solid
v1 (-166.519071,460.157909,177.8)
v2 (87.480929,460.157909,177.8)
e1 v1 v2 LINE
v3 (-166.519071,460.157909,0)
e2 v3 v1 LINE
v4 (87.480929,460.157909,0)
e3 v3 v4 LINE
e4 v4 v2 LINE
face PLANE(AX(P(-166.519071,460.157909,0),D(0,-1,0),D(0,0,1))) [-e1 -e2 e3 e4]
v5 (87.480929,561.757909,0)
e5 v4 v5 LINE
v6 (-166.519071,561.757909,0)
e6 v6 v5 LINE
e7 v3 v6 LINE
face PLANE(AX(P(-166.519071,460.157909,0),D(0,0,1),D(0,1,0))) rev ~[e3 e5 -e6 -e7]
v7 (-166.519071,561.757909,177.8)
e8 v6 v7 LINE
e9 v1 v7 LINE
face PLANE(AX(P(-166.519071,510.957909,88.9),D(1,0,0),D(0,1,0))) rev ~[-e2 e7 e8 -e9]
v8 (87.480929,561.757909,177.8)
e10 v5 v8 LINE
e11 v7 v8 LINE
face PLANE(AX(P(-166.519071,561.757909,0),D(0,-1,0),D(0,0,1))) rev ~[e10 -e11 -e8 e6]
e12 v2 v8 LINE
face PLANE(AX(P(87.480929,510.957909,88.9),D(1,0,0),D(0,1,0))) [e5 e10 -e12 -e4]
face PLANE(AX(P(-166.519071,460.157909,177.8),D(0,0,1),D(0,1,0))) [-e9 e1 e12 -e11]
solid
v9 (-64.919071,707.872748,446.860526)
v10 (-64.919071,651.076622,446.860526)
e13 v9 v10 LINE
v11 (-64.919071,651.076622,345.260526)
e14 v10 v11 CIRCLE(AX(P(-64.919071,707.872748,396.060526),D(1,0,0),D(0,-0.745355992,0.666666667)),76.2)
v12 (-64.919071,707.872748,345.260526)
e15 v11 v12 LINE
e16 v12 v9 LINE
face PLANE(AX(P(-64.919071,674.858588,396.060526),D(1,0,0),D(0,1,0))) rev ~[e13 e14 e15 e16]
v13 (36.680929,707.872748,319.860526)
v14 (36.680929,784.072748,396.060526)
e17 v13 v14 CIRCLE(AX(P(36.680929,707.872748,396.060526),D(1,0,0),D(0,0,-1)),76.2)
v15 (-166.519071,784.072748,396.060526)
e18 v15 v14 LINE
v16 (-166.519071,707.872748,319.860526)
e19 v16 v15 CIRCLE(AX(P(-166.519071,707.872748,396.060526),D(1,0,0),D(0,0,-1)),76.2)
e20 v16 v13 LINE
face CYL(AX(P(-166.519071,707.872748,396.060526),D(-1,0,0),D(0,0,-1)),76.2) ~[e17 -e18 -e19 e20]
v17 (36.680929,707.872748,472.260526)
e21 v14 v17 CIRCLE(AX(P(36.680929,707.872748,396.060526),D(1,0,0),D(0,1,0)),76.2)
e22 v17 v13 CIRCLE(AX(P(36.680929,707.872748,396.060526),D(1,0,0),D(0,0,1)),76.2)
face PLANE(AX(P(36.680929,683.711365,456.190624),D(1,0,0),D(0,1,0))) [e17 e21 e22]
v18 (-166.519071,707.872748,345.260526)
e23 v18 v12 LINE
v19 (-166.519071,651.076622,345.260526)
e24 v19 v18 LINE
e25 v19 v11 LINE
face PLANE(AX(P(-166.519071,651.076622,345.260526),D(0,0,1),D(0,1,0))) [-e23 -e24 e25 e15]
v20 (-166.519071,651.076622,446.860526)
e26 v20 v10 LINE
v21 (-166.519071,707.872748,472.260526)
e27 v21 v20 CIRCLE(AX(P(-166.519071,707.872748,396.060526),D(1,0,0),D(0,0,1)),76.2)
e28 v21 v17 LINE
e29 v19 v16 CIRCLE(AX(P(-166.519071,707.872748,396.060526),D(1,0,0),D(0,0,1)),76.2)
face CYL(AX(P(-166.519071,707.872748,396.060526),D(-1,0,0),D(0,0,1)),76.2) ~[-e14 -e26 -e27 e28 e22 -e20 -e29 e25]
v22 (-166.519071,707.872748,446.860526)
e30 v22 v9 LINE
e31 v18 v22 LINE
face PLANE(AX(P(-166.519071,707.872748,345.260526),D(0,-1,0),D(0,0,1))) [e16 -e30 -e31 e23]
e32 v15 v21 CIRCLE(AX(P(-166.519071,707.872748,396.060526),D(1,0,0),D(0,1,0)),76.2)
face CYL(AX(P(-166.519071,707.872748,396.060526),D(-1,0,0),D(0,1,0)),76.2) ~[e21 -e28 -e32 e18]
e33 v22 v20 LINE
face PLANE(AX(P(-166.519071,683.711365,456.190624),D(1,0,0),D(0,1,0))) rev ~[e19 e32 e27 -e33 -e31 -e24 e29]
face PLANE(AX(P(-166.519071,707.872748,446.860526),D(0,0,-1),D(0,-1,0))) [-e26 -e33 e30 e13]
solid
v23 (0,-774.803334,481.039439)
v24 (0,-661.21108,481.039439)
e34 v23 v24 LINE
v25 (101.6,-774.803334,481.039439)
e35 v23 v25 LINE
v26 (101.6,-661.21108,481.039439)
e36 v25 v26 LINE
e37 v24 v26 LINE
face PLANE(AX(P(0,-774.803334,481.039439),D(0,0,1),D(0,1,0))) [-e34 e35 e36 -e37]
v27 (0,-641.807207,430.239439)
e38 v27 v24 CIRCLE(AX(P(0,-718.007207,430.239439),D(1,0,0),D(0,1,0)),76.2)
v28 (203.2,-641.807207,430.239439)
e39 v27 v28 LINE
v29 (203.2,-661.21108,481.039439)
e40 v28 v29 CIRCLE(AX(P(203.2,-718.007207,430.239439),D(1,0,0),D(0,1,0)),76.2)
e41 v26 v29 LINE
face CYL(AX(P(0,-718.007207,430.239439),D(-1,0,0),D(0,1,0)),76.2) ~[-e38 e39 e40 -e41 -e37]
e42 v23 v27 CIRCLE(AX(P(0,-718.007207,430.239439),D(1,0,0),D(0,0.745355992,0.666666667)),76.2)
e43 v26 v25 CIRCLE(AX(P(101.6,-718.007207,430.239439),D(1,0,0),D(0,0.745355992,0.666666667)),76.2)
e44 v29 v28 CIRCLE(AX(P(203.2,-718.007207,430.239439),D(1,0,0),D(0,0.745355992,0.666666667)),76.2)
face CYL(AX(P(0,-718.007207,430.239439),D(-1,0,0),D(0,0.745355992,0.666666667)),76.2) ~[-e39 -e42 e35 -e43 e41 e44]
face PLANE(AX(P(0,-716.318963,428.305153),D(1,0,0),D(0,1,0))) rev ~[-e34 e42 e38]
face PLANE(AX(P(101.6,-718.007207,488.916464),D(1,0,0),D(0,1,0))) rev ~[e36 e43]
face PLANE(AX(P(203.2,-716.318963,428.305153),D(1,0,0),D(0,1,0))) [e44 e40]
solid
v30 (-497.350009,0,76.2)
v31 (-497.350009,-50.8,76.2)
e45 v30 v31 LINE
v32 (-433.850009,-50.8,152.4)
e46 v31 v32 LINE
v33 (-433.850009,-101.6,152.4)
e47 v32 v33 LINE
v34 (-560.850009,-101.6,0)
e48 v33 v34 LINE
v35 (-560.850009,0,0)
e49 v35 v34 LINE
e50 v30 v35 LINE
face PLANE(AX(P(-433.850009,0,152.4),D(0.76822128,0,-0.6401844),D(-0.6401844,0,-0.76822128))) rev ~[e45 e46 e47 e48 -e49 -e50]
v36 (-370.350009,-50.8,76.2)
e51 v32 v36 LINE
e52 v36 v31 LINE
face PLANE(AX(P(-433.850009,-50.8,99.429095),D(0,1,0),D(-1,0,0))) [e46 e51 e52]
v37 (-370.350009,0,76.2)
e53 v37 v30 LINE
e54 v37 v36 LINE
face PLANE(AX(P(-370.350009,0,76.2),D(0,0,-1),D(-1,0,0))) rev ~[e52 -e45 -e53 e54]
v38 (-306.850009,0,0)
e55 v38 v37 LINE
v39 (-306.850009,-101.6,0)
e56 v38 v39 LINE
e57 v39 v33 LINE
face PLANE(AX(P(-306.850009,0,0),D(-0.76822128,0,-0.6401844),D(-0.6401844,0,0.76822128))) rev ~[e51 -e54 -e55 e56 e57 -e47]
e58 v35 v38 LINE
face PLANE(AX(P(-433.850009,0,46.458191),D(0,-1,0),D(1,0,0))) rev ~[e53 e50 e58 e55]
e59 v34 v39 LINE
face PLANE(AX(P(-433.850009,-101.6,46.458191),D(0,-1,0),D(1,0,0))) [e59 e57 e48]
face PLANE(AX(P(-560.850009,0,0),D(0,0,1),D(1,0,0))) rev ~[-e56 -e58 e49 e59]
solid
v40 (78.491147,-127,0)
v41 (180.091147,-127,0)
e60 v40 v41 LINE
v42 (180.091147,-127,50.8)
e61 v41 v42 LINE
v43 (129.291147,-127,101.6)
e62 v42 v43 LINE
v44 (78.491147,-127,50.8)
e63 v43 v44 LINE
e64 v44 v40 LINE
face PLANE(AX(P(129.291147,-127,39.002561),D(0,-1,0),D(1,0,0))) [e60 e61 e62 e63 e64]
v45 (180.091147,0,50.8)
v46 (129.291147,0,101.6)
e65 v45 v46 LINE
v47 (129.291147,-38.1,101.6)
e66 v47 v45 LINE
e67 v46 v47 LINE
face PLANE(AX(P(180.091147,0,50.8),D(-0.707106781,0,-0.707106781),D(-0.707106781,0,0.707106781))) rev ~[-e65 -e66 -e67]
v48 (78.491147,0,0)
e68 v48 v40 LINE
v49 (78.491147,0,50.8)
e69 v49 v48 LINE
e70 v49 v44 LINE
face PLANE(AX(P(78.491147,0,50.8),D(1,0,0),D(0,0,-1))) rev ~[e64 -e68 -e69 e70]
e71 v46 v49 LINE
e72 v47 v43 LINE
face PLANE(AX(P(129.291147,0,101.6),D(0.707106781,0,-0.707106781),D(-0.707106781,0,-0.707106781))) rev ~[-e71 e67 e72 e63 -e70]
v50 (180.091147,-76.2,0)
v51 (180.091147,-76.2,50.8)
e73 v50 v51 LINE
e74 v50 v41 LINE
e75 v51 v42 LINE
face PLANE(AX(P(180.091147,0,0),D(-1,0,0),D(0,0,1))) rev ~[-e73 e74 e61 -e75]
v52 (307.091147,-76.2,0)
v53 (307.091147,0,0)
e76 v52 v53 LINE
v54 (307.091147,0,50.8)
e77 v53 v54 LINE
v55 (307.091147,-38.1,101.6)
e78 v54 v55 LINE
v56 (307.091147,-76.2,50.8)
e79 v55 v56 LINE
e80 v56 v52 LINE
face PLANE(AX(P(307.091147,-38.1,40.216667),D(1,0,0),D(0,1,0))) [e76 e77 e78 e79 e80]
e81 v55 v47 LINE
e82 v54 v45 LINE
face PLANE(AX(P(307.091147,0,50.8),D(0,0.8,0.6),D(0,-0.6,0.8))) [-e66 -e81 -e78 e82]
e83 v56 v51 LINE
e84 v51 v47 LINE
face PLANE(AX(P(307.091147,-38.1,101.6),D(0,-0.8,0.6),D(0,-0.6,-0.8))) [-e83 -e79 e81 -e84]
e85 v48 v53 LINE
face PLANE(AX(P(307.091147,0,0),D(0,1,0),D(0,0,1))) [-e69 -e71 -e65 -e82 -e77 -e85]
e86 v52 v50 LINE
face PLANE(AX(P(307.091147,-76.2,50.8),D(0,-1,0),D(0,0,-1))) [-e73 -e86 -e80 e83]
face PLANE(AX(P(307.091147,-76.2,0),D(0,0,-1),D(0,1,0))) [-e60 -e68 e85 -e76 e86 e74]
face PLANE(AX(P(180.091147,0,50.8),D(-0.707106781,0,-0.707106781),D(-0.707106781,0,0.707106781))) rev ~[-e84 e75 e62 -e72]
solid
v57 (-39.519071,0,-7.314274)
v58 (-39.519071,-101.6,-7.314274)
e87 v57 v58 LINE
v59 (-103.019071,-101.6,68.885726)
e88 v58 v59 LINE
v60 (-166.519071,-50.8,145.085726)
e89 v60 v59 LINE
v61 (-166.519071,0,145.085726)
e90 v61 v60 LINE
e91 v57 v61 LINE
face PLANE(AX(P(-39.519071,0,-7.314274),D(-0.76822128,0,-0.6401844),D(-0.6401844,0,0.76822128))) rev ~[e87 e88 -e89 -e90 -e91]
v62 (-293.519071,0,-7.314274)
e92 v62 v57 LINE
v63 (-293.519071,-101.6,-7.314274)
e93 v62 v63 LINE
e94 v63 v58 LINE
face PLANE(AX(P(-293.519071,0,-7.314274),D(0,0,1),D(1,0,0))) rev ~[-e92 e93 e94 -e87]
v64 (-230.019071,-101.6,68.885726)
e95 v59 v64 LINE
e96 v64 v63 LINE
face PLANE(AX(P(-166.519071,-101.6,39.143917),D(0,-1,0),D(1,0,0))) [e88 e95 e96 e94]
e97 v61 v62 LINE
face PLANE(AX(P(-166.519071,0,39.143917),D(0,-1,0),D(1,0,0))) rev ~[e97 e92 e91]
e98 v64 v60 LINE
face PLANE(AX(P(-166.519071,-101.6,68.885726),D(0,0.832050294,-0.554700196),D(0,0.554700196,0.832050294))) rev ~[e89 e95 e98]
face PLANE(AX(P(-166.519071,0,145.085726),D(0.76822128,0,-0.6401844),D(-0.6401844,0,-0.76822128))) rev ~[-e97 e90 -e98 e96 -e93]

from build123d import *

# Parameters (mm, degrees)
F1_DEPTH  = 101.6
F3_DEPTH  = 50.8
F5_DEPTH  = 101.6
F9_DEPTH  = 76.2
F11_DEPTH = 127
F14_DEPTH = 177.8
F16_DEPTH = 203.2
F18_DEPTH = 101.6
F20_DEPTH = 203.2
F21_DEPTH = 101.6
F22_W     = 101.6
F22_H     = 177.8
F23_DEPTH = 254


# Not quite as in the source:
# - a feature of the source that left no trace in its solid (it failed there, or was rolled back) is left out


with BuildPart() as f1:
    # F0 (on Front) → F1 (new body)
    with BuildSketch(Plane.XZ):
        Polygon((-433.850009223, 152.4), (-560.850009223, 0), (-306.850009223, 0), align=None)
    extrude(amount=F1_DEPTH)

    # F2 (on face) → F3 (cut)
    with BuildSketch(Plane(origin=(0, 0, 0), x_dir=(-1, 0, 0), z_dir=(0, 1, 0))):
        Polygon((433.850009223, 152.4), (370.350009223, 76.2), (497.350009223, 76.2), align=None)
    extrude(amount=-F3_DEPTH, mode=Mode.SUBTRACT)


with BuildPart() as f5:
    # F4 (on Front) → F5 (new body)
    with BuildSketch(Plane.XZ):
        Polygon((-293.5190707178, -7.3142740584), (-39.5190707178, -7.3142740584), (-166.5190707178, 145.0857259416), align=None)
    extrude(amount=F5_DEPTH)

    # F8 (on 3pt) → F9 (cut, symmetric)
    with BuildSketch(Plane.YZ.offset(-166.5190707178)):
        Polygon((-50.8, 145.0857259416), (-101.6, 145.0857259416), (-101.6, 68.8857259416), align=None)
    extrude(amount=F9_DEPTH, both=True, mode=Mode.SUBTRACT)


with BuildPart() as f11:
    # F10 (on Front) → F11 (new body)
    with BuildSketch(Plane.XZ):
        Polygon((78.4911467291, 50.8), (78.4911467291, 0), (180.0911467291, 0), (180.0911467291, 50.8), (129.2911467291, 101.6), align=None)
    extrude(amount=F11_DEPTH)

    # F13 (on offset) → F14 (join)
    with BuildSketch(Plane.YZ.offset(307.0911467291)):
        Polygon((-76.2, 0), (0, 0), (0, 50.8), (-38.1, 101.6), (-76.2, 50.8), align=None)
    extrude(amount=-F14_DEPTH)


with BuildPart() as f16:
    # F15 (on Right) → F16 (new body)
    with BuildSketch(Plane.YZ):
        with BuildLine():
            ThreePointArc((-774.8033335453, 481.0394390106), (-745.1970501575, 359.0555052577), (-641.8072069168, 430.2394390106))
            ThreePointArc((-641.8072069168, 430.2394390106), (-646.8232731639, 457.4292822513), (-661.2110802883, 481.0394390106))
            Line((-661.2110802883, 481.0394390106), (-718.0072069168, 481.0394390106))
            Line((-718.0072069168, 481.0394390106), (-774.8033335453, 481.0394390106))
        make_face()
        with BuildLine():
            Line((-718.0072069168, 481.0394390106), (-661.2110802883, 481.0394390106))
            ThreePointArc((-661.2110802883, 481.0394390106), (-718.0072069168, 506.4394390106), (-774.8033335453, 481.0394390106))
            Line((-774.8033335453, 481.0394390106), (-718.0072069168, 481.0394390106))
        make_face()
    extrude(amount=F16_DEPTH)

    # F15 (on Right) → F18 (cut)
    with BuildSketch(Plane.YZ):
        with BuildLine():
            Line((-718.0072069168, 481.0394390106), (-661.2110802883, 481.0394390106))
            ThreePointArc((-661.2110802883, 481.0394390106), (-718.0072069168, 506.4394390106), (-774.8033335453, 481.0394390106))
            Line((-774.8033335453, 481.0394390106), (-718.0072069168, 481.0394390106))
        make_face()
    extrude(amount=F18_DEPTH, mode=Mode.SUBTRACT)


with BuildPart() as f20:
    # F19 (on 3pt) → F20 (new body)
    with BuildSketch(Plane.YZ.offset(-166.5190707178)):
        with BuildLine():
            Line((707.8727483749, 446.860526371), (707.8727483749, 472.260526371))
            ThreePointArc((707.8727483749, 472.260526371), (676.7642286416, 465.6212911742), (651.0766217464, 446.860526371))
            Line((651.0766217464, 446.860526371), (707.8727483749, 446.860526371))
        make_face()
        with BuildLine():
            ThreePointArc((651.0766217464, 345.260526371), (676.7642286416, 326.4997615678), (707.8727483749, 319.860526371))
            Line((707.8727483749, 319.860526371), (707.8727483749, 345.260526371))
            Line((707.8727483749, 345.260526371), (651.0766217464, 345.260526371))
        make_face()
        with BuildLine():
            ThreePointArc((707.8727483749, 319.860526371), (761.7542851014, 342.1789896446), (784.0727483749, 396.060526371))
            ThreePointArc((784.0727483749, 396.060526371), (761.7542851014, 449.9420630974), (707.8727483749, 472.260526371))
            Line((707.8727483749, 472.260526371), (707.8727483749, 446.860526371))
            Line((707.8727483749, 446.860526371), (707.8727483749, 396.060526371))
            Line((707.8727483749, 396.060526371), (707.8727483749, 345.260526371))
            Line((707.8727483749, 345.260526371), (707.8727483749, 319.860526371))
        make_face()
        with BuildLine():
            Line((707.8727483749, 446.860526371), (651.0766217464, 446.860526371))
            ThreePointArc((651.0766217464, 446.860526371), (631.6727483749, 396.060526371), (651.0766217464, 345.260526371))
            Line((651.0766217464, 345.260526371), (707.8727483749, 345.260526371))
            Line((707.8727483749, 345.260526371), (707.8727483749, 396.060526371))
            Line((707.8727483749, 396.060526371), (707.8727483749, 446.860526371))
        make_face()
    extrude(amount=F20_DEPTH)

    # F19 (on 3pt) → F21 (cut)
    with BuildSketch(Plane.YZ.offset(-166.5190707178)):
        with BuildLine():
            Line((707.8727483749, 446.860526371), (651.0766217464, 446.860526371))
            ThreePointArc((651.0766217464, 446.860526371), (631.6727483749, 396.060526371), (651.0766217464, 345.260526371))
            Line((651.0766217464, 345.260526371), (707.8727483749, 345.260526371))
            Line((707.8727483749, 345.260526371), (707.8727483749, 396.060526371))
            Line((707.8727483749, 396.060526371), (707.8727483749, 446.860526371))
        make_face()
    extrude(amount=F21_DEPTH, mode=Mode.SUBTRACT)


with BuildPart() as f23:
    # F22 (on 3pt) → F23 (new body)
    with BuildSketch(Plane.YZ.offset(-166.5190707178)):
        with Locations((510.9579086026, 88.9)):
            Rectangle(F22_W, F22_H)
    extrude(amount=F23_DEPTH)


solid = Compound([f1.part, f5.part, f11.part, f16.part, f20.part, f23.part])
